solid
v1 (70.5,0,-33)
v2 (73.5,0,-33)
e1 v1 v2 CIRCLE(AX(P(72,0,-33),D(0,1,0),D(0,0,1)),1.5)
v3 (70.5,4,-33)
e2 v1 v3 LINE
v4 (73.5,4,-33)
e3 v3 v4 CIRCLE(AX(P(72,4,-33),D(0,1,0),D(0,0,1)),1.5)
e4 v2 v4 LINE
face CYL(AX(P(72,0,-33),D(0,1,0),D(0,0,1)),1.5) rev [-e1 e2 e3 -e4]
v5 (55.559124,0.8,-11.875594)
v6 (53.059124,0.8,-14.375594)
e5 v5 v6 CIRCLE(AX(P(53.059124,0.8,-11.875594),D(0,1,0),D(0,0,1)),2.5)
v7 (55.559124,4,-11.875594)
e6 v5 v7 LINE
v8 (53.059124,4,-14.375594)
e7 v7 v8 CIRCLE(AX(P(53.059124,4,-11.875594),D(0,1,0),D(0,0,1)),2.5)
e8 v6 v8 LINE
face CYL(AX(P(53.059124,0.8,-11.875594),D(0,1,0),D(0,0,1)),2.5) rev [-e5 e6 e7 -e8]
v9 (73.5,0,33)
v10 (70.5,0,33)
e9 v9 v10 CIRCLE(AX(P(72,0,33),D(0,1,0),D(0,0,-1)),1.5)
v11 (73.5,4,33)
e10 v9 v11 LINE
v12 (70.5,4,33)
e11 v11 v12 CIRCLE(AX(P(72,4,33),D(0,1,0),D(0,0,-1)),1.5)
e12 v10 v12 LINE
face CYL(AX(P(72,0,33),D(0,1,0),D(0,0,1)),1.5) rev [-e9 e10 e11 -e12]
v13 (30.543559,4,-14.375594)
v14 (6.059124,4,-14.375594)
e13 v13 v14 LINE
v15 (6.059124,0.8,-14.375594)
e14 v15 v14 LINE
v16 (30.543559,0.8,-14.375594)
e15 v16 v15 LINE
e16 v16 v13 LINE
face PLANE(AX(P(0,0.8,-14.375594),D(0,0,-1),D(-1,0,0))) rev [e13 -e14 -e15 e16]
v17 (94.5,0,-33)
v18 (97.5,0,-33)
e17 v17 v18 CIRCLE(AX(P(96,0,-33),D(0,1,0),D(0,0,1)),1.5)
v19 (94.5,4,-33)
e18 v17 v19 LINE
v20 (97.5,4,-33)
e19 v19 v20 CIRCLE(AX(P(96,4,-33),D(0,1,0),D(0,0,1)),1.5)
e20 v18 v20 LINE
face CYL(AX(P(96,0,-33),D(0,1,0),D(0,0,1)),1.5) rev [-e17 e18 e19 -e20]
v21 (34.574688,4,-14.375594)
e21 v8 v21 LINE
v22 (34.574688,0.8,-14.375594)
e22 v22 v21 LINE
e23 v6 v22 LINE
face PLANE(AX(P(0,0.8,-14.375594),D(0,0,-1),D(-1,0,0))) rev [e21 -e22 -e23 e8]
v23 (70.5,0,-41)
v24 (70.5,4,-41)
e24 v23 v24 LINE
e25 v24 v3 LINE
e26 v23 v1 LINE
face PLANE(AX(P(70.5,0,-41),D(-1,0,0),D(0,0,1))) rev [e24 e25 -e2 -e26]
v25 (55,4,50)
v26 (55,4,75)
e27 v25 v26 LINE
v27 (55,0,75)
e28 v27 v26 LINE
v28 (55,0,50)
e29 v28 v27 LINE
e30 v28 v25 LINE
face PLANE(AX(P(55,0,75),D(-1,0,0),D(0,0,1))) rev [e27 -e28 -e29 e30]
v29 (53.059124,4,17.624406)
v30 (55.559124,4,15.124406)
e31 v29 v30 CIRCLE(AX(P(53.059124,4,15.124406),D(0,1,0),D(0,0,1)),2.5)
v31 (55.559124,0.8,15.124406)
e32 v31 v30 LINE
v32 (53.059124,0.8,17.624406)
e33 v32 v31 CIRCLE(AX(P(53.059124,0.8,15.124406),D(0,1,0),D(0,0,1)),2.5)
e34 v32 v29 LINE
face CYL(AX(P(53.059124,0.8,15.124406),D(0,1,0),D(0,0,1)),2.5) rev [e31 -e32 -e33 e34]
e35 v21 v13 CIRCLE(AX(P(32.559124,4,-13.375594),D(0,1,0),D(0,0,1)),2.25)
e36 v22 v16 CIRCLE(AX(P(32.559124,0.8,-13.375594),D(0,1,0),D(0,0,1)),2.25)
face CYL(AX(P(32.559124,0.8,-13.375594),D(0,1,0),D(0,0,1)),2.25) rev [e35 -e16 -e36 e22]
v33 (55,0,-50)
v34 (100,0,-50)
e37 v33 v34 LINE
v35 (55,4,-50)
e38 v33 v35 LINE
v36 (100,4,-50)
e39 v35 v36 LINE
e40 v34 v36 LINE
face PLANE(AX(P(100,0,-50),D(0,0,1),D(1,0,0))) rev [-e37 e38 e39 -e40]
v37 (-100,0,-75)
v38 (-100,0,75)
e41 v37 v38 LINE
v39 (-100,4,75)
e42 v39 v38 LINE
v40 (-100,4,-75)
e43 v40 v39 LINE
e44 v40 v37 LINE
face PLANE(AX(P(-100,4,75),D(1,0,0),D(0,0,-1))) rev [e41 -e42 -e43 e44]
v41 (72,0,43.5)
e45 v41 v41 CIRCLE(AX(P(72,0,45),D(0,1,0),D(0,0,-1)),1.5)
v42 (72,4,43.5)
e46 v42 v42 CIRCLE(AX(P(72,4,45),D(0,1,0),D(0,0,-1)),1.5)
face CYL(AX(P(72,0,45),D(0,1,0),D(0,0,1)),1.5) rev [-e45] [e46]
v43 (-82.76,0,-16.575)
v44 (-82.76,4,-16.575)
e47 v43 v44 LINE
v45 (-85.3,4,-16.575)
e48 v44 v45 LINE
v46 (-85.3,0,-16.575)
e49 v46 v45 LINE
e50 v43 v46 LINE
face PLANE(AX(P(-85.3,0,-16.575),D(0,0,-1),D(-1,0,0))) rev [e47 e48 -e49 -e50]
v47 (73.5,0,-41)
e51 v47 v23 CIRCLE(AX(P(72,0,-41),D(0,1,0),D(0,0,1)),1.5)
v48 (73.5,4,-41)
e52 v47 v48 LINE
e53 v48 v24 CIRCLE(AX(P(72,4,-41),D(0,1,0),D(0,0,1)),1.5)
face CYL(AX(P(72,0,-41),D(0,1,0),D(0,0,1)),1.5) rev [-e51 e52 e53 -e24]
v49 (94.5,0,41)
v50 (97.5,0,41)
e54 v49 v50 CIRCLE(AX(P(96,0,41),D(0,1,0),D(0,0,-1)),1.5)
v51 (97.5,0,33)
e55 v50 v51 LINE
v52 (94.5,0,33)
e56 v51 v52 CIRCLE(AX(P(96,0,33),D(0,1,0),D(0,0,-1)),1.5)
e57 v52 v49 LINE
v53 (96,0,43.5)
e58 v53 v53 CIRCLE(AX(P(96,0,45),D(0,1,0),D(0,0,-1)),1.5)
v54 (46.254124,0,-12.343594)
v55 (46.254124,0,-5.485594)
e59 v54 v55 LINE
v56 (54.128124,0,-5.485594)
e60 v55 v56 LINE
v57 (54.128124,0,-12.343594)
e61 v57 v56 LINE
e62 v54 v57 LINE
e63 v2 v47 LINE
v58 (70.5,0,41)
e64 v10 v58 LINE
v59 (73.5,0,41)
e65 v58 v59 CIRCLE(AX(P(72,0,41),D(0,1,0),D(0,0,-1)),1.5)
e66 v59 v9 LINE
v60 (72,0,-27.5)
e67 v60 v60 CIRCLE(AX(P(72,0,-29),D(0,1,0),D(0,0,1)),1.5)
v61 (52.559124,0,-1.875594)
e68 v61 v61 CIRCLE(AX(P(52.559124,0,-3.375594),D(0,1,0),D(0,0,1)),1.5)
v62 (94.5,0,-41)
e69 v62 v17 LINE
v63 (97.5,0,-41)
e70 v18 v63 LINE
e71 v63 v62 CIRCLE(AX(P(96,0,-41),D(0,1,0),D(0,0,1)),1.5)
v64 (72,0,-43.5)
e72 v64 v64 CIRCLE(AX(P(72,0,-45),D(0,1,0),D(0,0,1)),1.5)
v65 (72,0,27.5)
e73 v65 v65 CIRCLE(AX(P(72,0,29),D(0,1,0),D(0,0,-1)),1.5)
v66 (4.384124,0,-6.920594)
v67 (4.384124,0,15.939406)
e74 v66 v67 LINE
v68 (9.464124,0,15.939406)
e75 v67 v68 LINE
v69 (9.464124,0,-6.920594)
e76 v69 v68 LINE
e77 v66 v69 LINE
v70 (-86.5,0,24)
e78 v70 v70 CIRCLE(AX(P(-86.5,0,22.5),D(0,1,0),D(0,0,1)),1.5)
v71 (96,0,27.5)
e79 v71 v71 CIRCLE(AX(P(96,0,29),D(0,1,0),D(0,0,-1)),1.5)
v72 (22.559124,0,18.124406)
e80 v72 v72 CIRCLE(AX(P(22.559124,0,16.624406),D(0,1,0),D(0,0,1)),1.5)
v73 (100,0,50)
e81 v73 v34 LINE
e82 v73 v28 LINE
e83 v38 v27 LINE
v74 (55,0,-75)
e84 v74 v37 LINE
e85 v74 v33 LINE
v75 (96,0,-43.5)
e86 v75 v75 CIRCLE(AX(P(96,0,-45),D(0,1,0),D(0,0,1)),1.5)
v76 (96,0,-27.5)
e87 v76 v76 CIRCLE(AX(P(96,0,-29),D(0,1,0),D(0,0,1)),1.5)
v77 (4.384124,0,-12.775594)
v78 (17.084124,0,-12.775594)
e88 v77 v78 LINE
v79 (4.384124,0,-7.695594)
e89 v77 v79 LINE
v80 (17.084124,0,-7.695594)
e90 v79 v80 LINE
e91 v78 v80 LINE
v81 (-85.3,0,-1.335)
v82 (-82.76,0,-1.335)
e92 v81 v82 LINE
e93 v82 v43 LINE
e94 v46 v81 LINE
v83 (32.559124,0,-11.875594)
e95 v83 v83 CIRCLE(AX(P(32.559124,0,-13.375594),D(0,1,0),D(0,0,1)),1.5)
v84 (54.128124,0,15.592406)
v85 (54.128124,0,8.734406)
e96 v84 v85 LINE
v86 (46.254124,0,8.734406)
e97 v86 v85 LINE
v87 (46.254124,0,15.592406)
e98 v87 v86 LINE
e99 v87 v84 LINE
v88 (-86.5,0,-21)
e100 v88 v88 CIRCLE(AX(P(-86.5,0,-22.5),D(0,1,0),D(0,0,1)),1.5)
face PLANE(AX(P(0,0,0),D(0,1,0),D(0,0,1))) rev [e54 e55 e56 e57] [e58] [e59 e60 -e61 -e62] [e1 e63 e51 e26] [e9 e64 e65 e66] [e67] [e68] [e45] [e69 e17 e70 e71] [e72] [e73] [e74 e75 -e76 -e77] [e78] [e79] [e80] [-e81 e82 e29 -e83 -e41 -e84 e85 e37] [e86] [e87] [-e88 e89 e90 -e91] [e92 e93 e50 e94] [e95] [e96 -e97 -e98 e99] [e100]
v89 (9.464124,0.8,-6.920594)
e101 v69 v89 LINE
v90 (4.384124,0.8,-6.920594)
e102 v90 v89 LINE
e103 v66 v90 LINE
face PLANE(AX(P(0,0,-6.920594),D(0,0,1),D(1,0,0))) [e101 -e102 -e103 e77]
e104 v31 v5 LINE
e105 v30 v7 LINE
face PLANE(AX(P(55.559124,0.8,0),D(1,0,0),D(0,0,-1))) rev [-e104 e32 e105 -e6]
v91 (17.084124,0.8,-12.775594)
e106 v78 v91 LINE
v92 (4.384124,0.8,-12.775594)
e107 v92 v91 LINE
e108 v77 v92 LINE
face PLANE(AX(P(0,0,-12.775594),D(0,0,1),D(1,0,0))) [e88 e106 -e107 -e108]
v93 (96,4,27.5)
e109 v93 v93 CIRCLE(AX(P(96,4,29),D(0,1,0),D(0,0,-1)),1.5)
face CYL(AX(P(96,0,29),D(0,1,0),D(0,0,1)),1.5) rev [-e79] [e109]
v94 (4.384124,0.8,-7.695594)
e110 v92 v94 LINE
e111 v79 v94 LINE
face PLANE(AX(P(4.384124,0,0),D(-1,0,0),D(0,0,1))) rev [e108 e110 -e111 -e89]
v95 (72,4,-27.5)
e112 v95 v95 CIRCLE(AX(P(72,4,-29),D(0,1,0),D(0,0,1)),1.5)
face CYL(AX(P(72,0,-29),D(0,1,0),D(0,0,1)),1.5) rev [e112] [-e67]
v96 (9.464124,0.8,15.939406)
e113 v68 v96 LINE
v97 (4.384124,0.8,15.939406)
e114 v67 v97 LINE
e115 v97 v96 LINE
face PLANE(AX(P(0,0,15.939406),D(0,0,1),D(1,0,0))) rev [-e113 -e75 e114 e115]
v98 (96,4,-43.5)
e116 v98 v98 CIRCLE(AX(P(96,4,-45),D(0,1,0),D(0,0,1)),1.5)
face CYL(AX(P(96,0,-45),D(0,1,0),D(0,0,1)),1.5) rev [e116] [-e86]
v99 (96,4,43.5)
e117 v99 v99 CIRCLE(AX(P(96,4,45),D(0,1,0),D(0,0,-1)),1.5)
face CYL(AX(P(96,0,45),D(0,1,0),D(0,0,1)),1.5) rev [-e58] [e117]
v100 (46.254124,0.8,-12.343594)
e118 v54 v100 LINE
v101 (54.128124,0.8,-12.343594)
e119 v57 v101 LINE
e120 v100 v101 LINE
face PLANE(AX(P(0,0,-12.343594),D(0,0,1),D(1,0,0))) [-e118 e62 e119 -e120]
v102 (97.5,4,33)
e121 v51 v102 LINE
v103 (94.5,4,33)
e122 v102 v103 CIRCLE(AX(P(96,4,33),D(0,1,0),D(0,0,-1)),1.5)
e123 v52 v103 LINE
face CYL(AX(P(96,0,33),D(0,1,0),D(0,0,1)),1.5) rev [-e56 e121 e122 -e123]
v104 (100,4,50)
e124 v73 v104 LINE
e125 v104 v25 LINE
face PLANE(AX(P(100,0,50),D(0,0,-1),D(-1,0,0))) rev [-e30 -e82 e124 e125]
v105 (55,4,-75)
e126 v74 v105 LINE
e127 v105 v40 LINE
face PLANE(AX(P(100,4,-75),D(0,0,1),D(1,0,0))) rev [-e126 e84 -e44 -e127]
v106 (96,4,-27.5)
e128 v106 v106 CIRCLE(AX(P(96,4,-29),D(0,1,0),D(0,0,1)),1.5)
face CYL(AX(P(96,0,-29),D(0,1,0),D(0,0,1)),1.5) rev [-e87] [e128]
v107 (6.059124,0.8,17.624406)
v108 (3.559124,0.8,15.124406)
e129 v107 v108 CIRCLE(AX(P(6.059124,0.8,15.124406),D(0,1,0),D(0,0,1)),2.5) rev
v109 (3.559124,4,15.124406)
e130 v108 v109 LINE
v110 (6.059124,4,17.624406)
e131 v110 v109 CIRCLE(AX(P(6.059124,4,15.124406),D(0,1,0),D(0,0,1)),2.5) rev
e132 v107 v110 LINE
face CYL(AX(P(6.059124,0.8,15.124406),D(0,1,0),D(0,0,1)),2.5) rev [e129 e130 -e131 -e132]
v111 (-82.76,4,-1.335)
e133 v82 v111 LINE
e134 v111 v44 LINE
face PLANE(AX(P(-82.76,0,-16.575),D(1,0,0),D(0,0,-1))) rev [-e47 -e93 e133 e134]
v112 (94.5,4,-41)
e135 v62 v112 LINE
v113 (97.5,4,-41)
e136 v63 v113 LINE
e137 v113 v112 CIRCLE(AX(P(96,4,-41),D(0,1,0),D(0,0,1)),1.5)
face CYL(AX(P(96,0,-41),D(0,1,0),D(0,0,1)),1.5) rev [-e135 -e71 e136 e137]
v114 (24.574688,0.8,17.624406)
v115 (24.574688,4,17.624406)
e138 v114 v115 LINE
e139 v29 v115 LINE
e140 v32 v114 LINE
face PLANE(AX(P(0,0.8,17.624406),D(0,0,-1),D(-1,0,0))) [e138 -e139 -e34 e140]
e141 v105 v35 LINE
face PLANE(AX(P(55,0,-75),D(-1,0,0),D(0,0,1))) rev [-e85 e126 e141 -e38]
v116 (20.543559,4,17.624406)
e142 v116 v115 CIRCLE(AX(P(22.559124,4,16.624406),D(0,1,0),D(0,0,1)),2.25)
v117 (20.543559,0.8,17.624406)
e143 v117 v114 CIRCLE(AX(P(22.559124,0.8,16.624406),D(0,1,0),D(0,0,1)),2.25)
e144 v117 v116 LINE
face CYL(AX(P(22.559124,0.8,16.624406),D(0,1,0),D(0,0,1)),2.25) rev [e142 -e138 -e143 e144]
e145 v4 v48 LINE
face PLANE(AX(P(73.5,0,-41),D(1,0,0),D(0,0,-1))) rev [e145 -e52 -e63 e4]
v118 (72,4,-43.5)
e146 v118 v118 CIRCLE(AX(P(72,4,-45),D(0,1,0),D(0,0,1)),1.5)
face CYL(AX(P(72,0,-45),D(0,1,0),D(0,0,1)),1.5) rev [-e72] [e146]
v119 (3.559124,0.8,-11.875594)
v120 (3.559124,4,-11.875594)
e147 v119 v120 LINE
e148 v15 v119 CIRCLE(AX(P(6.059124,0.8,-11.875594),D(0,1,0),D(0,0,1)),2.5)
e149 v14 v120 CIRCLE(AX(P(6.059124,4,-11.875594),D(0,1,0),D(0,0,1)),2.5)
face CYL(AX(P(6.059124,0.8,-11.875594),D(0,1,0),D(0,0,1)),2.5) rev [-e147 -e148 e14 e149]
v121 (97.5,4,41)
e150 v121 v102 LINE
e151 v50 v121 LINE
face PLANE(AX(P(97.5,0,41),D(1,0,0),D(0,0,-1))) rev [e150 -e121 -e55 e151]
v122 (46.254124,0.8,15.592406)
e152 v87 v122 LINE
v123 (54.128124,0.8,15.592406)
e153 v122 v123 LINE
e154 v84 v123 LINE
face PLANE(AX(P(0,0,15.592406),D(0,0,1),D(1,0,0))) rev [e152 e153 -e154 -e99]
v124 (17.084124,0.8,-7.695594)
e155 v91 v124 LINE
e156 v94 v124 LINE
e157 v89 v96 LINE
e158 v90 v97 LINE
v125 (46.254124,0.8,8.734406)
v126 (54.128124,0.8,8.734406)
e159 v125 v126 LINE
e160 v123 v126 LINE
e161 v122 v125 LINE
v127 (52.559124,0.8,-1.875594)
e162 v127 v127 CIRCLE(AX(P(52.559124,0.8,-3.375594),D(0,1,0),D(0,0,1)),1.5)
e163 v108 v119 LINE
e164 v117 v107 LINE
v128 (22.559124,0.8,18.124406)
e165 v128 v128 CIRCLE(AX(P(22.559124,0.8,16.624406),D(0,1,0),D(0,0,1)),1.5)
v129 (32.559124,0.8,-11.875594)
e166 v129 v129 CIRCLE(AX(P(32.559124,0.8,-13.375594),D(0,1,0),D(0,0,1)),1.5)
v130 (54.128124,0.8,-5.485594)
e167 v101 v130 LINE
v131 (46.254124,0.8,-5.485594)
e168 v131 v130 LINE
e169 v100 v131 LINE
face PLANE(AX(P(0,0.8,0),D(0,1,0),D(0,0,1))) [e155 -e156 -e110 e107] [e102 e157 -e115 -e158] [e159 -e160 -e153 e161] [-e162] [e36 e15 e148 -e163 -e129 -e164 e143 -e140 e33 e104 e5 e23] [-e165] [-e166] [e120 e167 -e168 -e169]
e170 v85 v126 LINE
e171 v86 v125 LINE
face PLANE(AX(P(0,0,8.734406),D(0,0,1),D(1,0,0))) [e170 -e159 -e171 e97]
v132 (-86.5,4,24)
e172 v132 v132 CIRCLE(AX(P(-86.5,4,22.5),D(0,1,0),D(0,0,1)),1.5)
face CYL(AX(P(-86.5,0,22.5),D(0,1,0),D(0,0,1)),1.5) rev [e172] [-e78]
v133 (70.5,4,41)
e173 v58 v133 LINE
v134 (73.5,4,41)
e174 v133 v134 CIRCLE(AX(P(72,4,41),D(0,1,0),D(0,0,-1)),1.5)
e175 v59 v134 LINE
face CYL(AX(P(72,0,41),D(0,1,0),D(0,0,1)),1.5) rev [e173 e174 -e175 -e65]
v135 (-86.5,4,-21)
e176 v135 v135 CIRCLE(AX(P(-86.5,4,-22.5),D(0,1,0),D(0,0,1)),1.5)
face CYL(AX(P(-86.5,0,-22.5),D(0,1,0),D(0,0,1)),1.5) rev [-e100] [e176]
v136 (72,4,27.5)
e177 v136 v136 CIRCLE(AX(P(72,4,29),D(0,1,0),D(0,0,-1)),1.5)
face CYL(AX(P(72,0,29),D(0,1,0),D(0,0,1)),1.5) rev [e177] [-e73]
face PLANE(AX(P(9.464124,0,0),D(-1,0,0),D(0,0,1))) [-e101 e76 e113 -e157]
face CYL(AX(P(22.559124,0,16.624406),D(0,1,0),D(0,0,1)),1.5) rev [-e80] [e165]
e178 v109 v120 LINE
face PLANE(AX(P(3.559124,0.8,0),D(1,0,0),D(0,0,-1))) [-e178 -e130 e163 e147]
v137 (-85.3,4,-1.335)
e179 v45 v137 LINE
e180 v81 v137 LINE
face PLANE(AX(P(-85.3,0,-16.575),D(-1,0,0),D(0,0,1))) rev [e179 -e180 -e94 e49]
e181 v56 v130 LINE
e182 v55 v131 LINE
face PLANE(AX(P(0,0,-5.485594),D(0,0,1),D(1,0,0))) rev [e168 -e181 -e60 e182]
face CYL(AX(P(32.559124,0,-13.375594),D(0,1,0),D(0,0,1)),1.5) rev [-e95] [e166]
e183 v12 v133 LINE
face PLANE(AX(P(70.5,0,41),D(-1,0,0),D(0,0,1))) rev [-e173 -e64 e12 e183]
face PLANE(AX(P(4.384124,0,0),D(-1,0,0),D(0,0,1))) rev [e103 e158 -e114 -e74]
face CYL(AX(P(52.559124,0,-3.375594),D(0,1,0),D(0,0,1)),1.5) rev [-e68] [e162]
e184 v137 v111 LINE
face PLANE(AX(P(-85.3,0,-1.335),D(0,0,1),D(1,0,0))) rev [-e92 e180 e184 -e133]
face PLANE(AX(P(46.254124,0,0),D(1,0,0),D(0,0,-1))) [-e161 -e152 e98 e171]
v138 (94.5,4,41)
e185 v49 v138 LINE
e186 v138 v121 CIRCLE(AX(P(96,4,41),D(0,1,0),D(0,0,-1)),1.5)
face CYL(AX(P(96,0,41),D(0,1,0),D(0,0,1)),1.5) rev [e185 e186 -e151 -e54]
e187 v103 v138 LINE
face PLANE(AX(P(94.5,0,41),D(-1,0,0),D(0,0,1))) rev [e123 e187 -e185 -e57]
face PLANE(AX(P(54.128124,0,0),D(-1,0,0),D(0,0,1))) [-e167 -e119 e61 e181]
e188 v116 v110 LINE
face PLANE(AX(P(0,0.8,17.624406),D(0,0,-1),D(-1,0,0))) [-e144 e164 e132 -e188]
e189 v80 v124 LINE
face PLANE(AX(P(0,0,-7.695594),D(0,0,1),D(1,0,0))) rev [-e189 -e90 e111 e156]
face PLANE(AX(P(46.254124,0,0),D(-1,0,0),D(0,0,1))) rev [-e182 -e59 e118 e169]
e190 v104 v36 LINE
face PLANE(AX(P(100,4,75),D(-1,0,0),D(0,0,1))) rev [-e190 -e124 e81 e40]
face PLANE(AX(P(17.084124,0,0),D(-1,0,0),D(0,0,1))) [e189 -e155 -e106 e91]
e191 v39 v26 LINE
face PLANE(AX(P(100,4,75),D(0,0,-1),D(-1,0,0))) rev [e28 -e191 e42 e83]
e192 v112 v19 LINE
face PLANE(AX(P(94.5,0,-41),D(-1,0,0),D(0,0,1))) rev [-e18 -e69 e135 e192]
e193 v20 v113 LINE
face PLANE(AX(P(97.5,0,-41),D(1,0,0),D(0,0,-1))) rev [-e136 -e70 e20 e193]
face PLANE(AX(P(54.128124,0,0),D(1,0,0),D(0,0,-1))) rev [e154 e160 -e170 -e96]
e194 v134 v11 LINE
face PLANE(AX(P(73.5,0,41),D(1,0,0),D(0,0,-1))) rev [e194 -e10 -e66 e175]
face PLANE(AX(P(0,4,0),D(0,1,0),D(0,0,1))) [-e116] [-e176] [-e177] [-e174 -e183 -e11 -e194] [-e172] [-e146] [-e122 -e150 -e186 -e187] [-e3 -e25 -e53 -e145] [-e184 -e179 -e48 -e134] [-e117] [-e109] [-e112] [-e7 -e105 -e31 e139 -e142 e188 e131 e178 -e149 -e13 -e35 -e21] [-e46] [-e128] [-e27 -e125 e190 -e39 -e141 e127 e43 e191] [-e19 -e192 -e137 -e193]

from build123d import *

# Parameters (mm, degrees)
SKETCH_1_W             = 200
SKETCH_1_H             = 150
EXTRUDE_1196_DEPTH     = 4
SKETCH_1250_R          = 1.5
SKETCH_1250_W          = 12.7
SKETCH_1250_H          = 5.08
SKETCH_1250_W_2        = 5.08
SKETCH_1250_H_2        = 22.86
SKETCH_1250_W_3        = 7.874
SKETCH_1250_H_3        = 6.858
DMOTOR_DEPTH           = 3.2
DMOTOR_2_OUTLINE_R     = 1.5
DMOTOR_2_OUTLINE_W     = 7.874
DMOTOR_2_OUTLINE_H     = 6.858
DMOTOR_2_OUTLINE_W_2   = 12.7
DMOTOR_2_OUTLINE_H_2   = 5.08
DMOTOR_2_OUTLINE_W_3   = 5.08
DMOTOR_2_OUTLINE_H_3   = 22.86
DMOTOR_2_DEPTH         = 4
LINELANCE_2_R          = 1.5
LINELANCE_2_W          = 2.54
LINELANCE_2_H          = 15.24
LINELANCE_DEPTH        = 126.063983624
SKETCH_3356_R          = 1.5
SKETCH_3356_W          = 45
SKETCH_3356_H          = 25
CUT_EXTRUDE_4137_DEPTH = 126.063983624


# Read off the part's stored shape, not the designer's step: Вырез для компонентов DMotor
with BuildPart() as part:
    # Эскиз1 → Extrude 1196 (new body)
    with BuildSketch(Plane(origin=(0, 0, 0), x_dir=(1, 0, 0), z_dir=(0, 1, 0))):
        Rectangle(SKETCH_1_W, SKETCH_1_H)
    extrude(amount=EXTRUDE_1196_DEPTH)

    # Sketch 1250 → DMotor (cut)
    with BuildSketch(Plane(origin=(0, 4, 0), x_dir=(1, 0, 0), z_dir=(0, 1, 0))):
        with BuildLine():
            Line((30.543559349, 14.375593505), (6.059123786, 14.375593505))
            ThreePointArc((6.059123786, 14.375593505), (4.291356833, 13.643360458), (3.559123786, 11.875593505))
            Line((3.559123786, 11.875593505), (3.559123786, -15.124406495))
            ThreePointArc((3.559123786, -15.124406495), (4.291356833, -16.892173448), (6.059123786, -17.624406495))
            Line((6.059123786, -17.624406495), (20.543559349, -17.624406495))
            ThreePointArc((20.543559349, -17.624406495), (22.559123786, -18.874406495), (24.574688223, -17.624406495))
            Line((24.574688223, -17.624406495), (53.059123786, -17.624406495))
            ThreePointArc((53.059123786, -17.624406495), (54.826890739, -16.892173448), (55.559123786, -15.124406495))
            Line((55.559123786, -15.124406495), (55.559123786, 11.875593505))
            ThreePointArc((55.559123786, 11.875593505), (54.826890739, 13.643360458), (53.059123786, 14.375593505))
            Line((53.059123786, 14.375593505), (34.574688223, 14.375593505))
            ThreePointArc((34.574688223, 14.375593505), (32.559123786, 15.625593505), (30.543559349, 14.375593505))
        make_face()
        with Locations(Location((22.559123786, -16.624406495, 0), (0, 0, 270))):
            Circle(SKETCH_1250_R, mode=Mode.SUBTRACT)
        with Locations(Location((32.559123786, 13.375593505, 0), (0, 0, 270))):
            Circle(SKETCH_1250_R, mode=Mode.SUBTRACT)
        with Locations(Location((52.559123786, 3.375593505, 0), (0, 0, 270))):
            Circle(SKETCH_1250_R, mode=Mode.SUBTRACT)
        with Locations((10.734123786, 10.235593505)):
            Rectangle(SKETCH_1250_W, SKETCH_1250_H, mode=Mode.SUBTRACT)
        with Locations((6.924123786, -4.509406495)):
            Rectangle(SKETCH_1250_W_2, SKETCH_1250_H_2, mode=Mode.SUBTRACT)
        with Locations((50.191123786, 8.914593505)):
            Rectangle(SKETCH_1250_W_3, SKETCH_1250_H_3, mode=Mode.SUBTRACT)
        with Locations((50.191123786, -12.163406495)):
            Rectangle(SKETCH_1250_W_3, SKETCH_1250_H_3, mode=Mode.SUBTRACT)
    extrude(amount=-DMOTOR_DEPTH, mode=Mode.SUBTRACT)

    # DMotor 2 outline → DMotor 2 (cut)
    with BuildSketch(Plane(origin=(0, 0, 0), x_dir=(1, 0, 0), z_dir=(0, 1, 0))):
        with Locations((32.559123786, 13.375593505)):
            Circle(DMOTOR_2_OUTLINE_R)
        with Locations((50.191123786, -12.163406495)):
            Rectangle(DMOTOR_2_OUTLINE_W, DMOTOR_2_OUTLINE_H)
        with Locations((50.191123786, 8.914593505)):
            Rectangle(DMOTOR_2_OUTLINE_W, DMOTOR_2_OUTLINE_H)
        with Locations((10.734123786, 10.235593505)):
            Rectangle(DMOTOR_2_OUTLINE_W_2, DMOTOR_2_OUTLINE_H_2)
        with Locations((6.924123786, -4.509406495)):
            Rectangle(DMOTOR_2_OUTLINE_W_3, DMOTOR_2_OUTLINE_H_3)
        with Locations((22.559123786, -16.624406495)):
            Circle(DMOTOR_2_OUTLINE_R)
        with Locations((52.559123786, 3.375593505)):
            Circle(DMOTOR_2_OUTLINE_R)
    extrude(amount=DMOTOR_2_DEPTH, mode=Mode.SUBTRACT)

    # Linelance 2 → Linelance (cut, through all)
    with BuildSketch(Plane(origin=(0, 4, 0), x_dir=(1, 0, 0), z_dir=(0, 1, 0))):
        with Locations(Location((-86.5, 22.5, 0), (0, 0, 270))):
            Circle(LINELANCE_2_R)
        with Locations(Location((-86.5, -22.5, 0), (0, 0, 270))):
            Circle(LINELANCE_2_R)
        with Locations((-84.03, 8.955)):
            Rectangle(LINELANCE_2_W, LINELANCE_2_H)
    extrude(amount=-LINELANCE_DEPTH, mode=Mode.SUBTRACT)

    # Sketch 3356 → Cut-Extrude 4137 (cut, through all)
    with BuildSketch(Plane(origin=(0, 4, 0), x_dir=(1, 0, 0), z_dir=(0, 1, 0))):
        with Locations(Location((72, 45, 0), (0, 0, 270))):
            Circle(SKETCH_3356_R)
        with Locations(Location((72, 29, 0), (0, 0, 270))):
            Circle(SKETCH_3356_R)
        with Locations(Location((96, 45, 0), (0, 0, 270))):
            Circle(SKETCH_3356_R)
        with Locations(Location((96, 29, 0), (0, 0, 270))):
            Circle(SKETCH_3356_R)
        with Locations(Location((96, -29, 0), (0, 0, 90))):
            Circle(SKETCH_3356_R)
        with Locations(Location((96, -45, 0), (0, 0, 90))):
            Circle(SKETCH_3356_R)
        with Locations(Location((72, -29, 0), (0, 0, 90))):
            Circle(SKETCH_3356_R)
        with Locations(Location((72, -45, 0), (0, 0, 90))):
            Circle(SKETCH_3356_R)
        with Locations((77.5, 62.5)):
            Rectangle(SKETCH_3356_W, SKETCH_3356_H)
        with Locations((77.5, -62.5)):
            Rectangle(SKETCH_3356_W, SKETCH_3356_H)
        with BuildLine():
            Line((73.5, 41), (73.5, 33))
            ThreePointArc((73.5, 33), (72, 31.5), (70.5, 33))
            Line((70.5, 33), (70.5, 41))
            ThreePointArc((70.5, 41), (72, 42.5), (73.5, 41))
        make_face()
        with BuildLine():
            Line((97.5, 41), (97.5, 33))
            ThreePointArc((97.5, 33), (96, 31.5), (94.5, 33))
            Line((94.5, 33), (94.5, 41))
            ThreePointArc((94.5, 41), (96, 42.5), (97.5, 41))
        make_face()
        with BuildLine():
            Line((73.5, -41), (73.5, -33))
            ThreePointArc((73.5, -33), (72, -31.5), (70.5, -33))
            Line((70.5, -33), (70.5, -41))
            ThreePointArc((70.5, -41), (72, -42.5), (73.5, -41))
        make_face()
        with BuildLine():
            Line((97.5, -41), (97.5, -33))
            ThreePointArc((97.5, -33), (96, -31.5), (94.5, -33))
            Line((94.5, -33), (94.5, -41))
            ThreePointArc((94.5, -41), (96, -42.5), (97.5, -41))
        make_face()
    extrude(amount=-CUT_EXTRUDE_4137_DEPTH, mode=Mode.SUBTRACT)


solid = part.part
